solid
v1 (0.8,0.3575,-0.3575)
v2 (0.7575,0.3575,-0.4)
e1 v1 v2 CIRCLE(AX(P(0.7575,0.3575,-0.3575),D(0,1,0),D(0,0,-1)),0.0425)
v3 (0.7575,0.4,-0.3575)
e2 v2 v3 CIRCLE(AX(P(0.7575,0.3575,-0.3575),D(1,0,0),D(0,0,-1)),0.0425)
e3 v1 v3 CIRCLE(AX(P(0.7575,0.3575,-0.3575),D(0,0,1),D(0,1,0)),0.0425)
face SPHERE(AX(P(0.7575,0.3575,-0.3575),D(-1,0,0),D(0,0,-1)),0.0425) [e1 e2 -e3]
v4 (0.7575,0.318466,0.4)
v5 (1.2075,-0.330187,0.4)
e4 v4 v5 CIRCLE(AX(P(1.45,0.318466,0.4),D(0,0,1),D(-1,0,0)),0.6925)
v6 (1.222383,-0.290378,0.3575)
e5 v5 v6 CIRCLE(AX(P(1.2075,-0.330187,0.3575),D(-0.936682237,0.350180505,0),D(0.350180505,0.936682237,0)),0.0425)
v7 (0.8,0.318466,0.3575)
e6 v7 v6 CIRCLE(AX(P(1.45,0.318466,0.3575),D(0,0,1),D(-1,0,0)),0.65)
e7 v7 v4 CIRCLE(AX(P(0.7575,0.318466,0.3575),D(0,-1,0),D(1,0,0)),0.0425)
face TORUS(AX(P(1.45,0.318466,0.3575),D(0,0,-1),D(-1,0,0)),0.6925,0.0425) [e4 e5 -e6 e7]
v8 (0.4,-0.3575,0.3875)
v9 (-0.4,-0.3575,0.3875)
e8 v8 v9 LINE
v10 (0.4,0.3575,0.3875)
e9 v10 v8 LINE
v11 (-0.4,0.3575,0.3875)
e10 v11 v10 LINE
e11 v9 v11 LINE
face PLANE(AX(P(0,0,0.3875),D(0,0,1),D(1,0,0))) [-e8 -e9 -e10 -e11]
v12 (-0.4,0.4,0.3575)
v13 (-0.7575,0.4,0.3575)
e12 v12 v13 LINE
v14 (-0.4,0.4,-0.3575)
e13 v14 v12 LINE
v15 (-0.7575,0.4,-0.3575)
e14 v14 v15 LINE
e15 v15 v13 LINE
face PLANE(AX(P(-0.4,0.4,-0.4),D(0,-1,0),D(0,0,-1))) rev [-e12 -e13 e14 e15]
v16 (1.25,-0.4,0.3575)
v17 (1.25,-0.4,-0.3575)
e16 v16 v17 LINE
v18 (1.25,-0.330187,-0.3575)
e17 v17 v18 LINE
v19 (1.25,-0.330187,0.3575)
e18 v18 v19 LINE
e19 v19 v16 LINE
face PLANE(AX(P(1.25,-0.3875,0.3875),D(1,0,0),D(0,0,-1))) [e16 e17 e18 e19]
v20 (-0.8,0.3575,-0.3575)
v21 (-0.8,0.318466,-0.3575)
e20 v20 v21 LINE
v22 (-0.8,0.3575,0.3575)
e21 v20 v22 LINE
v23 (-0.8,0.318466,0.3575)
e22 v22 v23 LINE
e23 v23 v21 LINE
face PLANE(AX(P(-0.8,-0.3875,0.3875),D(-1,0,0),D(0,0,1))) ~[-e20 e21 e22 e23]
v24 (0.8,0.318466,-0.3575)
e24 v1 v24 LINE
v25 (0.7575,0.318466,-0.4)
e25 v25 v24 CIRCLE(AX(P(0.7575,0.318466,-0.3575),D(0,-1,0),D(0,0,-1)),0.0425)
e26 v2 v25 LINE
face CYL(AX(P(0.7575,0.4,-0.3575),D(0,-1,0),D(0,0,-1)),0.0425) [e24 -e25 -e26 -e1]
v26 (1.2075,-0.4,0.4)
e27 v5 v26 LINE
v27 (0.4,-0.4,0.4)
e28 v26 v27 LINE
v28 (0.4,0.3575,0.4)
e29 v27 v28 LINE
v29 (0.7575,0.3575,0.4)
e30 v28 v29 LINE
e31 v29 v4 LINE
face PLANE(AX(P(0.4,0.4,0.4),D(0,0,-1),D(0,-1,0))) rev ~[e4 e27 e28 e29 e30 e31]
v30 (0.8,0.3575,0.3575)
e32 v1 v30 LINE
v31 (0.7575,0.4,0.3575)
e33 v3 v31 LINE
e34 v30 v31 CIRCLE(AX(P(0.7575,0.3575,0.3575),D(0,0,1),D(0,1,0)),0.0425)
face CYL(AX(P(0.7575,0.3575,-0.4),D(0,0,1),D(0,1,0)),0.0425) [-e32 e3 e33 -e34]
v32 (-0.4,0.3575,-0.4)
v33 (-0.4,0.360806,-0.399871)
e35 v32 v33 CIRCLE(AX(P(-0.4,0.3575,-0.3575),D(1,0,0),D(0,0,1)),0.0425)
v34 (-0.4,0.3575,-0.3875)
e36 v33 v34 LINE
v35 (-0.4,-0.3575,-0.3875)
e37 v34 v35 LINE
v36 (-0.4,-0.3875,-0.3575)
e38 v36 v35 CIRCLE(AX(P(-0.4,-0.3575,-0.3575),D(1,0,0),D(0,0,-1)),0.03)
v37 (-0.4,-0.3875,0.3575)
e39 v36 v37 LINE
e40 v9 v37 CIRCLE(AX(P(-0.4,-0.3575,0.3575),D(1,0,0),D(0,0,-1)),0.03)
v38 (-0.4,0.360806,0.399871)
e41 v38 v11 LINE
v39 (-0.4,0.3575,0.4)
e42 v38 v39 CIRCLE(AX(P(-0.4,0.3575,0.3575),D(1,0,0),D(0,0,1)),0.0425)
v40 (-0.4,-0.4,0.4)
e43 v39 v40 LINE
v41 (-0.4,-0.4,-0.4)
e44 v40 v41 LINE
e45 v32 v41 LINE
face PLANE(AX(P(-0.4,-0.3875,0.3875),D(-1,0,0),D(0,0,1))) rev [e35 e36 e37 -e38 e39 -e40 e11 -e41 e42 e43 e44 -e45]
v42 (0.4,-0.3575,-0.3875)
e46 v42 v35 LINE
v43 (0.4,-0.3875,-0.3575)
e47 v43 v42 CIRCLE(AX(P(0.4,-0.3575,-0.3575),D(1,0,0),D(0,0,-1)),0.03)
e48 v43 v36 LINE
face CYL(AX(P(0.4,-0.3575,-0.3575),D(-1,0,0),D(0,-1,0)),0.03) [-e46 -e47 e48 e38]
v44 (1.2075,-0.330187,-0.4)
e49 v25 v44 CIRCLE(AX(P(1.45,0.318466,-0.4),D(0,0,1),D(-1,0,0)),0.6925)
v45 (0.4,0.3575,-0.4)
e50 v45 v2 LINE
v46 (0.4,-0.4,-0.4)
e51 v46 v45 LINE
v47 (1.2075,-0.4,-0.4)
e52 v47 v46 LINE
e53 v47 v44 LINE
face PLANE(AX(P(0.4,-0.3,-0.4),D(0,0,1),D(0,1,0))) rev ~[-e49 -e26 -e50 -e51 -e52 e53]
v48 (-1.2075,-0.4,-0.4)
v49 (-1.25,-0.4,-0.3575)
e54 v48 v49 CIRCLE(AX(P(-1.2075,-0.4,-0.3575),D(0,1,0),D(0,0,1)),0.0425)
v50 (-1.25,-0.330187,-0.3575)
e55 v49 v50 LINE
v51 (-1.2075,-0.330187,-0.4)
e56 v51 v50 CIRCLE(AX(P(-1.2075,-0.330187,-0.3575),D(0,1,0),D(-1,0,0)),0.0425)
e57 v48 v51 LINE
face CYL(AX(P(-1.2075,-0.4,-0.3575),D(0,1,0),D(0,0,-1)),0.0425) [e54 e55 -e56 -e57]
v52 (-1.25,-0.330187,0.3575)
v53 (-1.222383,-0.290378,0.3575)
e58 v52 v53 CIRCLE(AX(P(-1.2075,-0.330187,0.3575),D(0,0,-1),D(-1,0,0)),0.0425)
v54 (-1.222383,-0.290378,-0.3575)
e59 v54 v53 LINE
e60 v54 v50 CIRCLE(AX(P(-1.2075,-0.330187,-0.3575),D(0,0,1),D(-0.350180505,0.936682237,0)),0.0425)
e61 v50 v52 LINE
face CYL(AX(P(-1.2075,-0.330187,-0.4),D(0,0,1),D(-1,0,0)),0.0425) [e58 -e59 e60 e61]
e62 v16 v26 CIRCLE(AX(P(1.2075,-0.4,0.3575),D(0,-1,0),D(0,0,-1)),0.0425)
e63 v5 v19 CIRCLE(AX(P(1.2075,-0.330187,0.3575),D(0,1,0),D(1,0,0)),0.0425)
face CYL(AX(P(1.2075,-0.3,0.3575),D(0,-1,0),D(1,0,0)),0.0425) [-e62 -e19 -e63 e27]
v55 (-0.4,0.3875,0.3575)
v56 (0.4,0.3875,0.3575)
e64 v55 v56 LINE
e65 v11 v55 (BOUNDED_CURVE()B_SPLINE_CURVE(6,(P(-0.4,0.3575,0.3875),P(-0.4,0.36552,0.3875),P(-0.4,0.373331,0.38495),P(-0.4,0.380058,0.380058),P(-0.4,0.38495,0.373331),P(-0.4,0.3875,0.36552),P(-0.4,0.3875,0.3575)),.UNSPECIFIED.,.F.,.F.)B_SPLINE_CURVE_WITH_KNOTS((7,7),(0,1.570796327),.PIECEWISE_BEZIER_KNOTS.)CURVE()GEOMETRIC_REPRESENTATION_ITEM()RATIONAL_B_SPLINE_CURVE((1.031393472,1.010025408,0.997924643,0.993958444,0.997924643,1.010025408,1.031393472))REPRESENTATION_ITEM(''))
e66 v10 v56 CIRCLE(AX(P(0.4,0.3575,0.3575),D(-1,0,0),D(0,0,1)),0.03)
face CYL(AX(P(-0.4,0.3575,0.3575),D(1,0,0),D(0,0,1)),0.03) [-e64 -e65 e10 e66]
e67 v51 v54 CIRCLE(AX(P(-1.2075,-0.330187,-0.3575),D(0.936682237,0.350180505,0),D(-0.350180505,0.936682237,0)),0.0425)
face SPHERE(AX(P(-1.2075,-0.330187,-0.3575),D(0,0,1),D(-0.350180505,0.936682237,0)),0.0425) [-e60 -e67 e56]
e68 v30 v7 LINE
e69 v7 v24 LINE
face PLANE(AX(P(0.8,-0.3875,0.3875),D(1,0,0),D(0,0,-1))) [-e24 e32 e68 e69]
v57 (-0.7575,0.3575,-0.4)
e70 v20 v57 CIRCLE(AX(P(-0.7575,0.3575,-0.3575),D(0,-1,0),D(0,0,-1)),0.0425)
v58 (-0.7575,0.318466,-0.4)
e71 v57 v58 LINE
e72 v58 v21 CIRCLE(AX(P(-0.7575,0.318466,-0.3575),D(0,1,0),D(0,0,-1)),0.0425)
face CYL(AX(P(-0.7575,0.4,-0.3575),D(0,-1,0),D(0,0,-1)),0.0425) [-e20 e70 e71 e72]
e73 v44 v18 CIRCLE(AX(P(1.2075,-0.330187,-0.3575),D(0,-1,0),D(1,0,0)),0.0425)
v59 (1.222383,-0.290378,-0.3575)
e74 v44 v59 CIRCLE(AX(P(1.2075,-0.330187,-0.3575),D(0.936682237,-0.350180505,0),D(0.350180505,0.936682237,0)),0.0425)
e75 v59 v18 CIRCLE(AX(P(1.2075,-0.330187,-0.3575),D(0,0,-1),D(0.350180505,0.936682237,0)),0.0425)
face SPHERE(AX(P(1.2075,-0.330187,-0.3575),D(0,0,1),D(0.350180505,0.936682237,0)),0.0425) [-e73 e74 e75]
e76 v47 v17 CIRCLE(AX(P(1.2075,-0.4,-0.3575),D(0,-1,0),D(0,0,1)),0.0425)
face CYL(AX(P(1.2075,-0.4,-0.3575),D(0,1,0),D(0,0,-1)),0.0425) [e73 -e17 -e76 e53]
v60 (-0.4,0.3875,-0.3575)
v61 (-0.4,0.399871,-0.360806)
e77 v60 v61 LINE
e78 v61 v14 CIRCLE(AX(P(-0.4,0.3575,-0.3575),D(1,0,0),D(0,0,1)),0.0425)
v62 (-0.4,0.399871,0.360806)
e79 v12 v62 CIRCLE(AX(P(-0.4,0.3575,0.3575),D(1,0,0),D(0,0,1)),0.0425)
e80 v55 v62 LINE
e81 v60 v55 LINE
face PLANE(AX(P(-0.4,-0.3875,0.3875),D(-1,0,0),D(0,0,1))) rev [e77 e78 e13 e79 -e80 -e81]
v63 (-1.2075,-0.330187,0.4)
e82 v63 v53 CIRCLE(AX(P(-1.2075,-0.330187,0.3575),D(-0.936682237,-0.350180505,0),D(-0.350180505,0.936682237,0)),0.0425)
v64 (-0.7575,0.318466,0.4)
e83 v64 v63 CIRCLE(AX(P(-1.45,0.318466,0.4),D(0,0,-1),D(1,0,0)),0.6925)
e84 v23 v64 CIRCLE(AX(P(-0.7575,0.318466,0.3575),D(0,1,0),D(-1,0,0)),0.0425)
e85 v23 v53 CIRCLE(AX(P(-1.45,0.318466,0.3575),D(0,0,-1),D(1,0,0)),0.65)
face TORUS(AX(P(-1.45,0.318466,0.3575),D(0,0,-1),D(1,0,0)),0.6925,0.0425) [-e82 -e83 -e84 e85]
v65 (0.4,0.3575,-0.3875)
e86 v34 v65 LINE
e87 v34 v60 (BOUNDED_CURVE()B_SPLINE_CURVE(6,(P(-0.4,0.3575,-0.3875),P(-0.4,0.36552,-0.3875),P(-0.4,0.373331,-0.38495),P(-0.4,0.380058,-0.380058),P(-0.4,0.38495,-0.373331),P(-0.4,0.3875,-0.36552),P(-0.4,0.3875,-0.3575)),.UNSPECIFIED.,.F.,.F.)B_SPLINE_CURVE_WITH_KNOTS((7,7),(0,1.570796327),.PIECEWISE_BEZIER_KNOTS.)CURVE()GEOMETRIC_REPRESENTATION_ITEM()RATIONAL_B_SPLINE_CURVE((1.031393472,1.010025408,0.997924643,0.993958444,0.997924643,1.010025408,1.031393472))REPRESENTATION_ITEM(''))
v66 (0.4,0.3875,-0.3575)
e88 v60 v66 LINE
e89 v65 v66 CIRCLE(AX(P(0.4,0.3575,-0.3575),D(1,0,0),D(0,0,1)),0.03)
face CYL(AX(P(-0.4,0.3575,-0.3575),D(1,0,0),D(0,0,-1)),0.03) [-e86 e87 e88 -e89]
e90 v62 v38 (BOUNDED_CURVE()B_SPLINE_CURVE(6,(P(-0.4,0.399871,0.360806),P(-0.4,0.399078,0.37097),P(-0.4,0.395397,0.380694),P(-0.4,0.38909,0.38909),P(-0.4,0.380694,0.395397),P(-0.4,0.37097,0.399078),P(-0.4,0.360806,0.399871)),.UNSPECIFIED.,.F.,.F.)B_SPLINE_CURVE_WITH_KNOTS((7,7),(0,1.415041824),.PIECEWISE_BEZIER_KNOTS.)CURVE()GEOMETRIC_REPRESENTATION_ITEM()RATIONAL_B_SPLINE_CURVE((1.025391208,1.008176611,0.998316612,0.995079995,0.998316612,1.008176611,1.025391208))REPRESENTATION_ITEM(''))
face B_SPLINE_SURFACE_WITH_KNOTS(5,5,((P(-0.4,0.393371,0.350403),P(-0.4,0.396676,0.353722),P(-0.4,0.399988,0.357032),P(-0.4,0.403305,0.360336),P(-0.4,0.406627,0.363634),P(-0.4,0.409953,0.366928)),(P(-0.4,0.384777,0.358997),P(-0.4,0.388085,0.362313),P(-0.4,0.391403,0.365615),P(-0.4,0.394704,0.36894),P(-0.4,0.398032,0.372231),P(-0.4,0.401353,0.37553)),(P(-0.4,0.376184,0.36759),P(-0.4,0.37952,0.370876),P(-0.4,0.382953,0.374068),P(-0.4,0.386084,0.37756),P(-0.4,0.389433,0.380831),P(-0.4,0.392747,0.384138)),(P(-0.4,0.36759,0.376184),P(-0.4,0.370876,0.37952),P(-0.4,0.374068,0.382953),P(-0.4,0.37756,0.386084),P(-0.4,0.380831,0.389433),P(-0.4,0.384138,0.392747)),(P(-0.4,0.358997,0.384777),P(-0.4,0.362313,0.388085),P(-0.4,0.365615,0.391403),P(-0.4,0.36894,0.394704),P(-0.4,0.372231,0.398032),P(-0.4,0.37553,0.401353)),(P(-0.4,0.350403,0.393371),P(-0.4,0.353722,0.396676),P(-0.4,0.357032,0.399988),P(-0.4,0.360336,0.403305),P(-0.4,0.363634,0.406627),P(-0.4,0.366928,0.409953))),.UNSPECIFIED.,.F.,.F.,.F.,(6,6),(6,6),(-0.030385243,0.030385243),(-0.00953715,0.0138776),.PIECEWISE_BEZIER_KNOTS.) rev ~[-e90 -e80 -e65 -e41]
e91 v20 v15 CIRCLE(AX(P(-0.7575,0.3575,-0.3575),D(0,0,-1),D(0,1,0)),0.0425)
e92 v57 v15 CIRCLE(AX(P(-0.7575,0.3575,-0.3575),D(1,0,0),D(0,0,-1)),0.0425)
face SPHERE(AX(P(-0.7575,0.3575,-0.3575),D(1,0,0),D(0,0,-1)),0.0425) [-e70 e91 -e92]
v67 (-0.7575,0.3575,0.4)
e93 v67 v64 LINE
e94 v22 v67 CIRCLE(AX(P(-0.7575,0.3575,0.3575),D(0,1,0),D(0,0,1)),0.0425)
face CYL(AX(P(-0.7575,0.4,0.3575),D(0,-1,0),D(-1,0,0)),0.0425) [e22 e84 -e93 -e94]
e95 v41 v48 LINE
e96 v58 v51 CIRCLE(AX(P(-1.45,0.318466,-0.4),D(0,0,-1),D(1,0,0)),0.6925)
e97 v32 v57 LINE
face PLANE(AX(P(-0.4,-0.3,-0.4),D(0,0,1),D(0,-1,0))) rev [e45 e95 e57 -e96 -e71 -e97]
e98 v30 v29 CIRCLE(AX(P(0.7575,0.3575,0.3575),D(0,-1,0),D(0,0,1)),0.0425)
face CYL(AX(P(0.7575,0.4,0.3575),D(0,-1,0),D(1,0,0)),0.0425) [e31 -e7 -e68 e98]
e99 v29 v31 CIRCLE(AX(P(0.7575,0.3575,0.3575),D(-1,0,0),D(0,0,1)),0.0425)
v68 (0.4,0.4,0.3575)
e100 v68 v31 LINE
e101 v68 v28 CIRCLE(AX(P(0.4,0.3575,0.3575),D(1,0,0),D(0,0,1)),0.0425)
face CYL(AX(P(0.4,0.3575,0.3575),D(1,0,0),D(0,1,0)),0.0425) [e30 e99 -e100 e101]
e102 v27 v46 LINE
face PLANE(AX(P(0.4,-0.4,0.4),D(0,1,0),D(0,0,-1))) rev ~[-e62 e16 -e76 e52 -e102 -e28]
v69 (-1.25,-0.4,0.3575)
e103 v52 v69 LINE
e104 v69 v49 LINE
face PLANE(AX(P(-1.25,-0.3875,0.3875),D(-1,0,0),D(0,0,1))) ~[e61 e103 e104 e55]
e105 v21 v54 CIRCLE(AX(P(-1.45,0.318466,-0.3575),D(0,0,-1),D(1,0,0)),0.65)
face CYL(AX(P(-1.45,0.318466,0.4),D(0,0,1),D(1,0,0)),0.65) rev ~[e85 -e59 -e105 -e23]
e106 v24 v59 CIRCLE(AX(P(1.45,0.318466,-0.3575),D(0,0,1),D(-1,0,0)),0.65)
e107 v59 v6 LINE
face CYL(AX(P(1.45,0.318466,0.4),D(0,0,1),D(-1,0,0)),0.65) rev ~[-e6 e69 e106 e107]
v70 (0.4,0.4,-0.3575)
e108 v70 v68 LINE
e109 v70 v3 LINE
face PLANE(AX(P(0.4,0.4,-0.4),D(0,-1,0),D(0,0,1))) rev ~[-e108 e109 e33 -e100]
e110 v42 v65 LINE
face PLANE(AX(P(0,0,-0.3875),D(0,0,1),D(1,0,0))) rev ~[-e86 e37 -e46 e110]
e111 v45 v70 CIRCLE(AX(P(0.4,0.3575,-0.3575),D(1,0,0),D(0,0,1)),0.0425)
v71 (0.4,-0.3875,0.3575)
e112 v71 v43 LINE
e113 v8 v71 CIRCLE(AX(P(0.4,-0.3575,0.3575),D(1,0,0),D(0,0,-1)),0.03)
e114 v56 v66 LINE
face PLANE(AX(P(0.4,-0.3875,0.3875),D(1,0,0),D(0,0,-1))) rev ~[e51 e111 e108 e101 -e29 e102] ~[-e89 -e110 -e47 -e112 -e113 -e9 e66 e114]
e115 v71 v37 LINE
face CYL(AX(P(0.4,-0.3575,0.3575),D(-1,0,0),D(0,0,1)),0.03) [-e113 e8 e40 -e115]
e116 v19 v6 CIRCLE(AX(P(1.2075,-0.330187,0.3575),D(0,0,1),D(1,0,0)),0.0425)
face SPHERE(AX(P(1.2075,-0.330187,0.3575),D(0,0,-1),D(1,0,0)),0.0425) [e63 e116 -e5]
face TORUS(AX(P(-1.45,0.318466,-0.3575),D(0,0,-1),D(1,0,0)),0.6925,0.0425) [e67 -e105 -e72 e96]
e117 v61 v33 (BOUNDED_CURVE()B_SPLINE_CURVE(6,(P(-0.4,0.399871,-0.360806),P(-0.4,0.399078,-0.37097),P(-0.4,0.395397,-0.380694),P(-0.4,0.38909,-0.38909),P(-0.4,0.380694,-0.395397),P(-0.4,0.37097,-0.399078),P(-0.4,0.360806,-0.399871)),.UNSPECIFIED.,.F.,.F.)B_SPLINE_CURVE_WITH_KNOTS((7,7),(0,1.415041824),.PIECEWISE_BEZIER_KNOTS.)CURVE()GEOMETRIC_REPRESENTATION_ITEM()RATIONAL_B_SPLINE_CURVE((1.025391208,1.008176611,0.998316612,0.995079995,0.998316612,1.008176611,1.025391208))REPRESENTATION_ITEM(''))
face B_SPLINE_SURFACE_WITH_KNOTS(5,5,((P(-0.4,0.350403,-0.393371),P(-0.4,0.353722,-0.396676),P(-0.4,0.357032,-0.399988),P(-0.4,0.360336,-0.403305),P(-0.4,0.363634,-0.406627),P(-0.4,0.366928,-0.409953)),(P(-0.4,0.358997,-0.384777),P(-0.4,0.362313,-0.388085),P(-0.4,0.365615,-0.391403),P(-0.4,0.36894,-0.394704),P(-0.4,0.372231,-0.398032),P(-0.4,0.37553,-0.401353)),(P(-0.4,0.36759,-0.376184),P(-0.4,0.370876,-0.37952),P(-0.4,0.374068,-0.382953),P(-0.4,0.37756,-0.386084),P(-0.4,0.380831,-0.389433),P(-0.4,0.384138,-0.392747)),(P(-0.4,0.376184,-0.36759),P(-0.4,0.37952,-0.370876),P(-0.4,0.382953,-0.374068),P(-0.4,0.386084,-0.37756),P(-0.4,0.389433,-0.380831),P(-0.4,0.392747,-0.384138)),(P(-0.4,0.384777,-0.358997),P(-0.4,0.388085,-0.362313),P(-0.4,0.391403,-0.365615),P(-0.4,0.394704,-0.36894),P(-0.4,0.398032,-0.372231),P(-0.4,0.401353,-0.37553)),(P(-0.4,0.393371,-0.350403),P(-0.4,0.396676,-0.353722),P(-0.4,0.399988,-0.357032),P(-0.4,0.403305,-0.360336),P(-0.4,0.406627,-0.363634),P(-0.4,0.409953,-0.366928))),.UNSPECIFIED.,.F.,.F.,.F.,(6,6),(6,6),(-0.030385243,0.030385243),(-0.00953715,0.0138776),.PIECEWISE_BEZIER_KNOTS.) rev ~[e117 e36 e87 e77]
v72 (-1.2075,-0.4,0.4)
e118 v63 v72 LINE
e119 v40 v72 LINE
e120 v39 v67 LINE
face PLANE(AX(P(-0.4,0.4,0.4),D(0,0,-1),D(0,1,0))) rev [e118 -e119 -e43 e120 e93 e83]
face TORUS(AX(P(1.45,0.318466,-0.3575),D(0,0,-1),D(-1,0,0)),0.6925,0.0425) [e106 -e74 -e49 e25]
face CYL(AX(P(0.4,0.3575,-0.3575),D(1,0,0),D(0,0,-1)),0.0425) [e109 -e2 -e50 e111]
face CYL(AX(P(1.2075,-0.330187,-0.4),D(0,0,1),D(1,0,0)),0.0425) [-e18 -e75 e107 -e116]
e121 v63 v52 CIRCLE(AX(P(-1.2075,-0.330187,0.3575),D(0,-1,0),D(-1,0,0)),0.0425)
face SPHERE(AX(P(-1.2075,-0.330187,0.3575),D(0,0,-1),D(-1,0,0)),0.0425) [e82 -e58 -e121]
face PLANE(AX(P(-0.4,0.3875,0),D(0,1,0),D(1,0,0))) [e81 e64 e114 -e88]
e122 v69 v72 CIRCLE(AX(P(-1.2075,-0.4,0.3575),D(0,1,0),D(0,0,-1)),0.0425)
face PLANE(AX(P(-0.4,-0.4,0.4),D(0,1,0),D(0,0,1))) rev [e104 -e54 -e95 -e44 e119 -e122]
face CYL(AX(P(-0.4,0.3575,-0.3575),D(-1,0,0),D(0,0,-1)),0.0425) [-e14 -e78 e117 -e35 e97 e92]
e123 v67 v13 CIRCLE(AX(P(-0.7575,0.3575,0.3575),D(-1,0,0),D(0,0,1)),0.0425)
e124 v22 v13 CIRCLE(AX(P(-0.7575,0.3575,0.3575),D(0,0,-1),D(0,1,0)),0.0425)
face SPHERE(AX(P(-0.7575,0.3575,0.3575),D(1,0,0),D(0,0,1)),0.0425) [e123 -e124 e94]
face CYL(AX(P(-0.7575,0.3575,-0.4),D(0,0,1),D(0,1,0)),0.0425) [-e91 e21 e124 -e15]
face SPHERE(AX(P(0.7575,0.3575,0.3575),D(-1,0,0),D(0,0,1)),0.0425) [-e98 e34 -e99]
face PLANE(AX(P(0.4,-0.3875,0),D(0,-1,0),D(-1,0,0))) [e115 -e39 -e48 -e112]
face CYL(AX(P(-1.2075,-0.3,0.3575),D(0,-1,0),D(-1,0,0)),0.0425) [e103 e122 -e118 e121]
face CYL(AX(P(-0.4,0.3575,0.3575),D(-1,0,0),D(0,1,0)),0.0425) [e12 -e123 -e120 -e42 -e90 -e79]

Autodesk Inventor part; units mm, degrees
ref_plane "YZ Plane" through (0, 0, 0) normal (1, 0, 0) x (0, 1, 0)
ref_plane "XZ Plane" through (0, 0, 0) normal (0, 1, 0) x (-1, 0, 0)
ref_plane "XY Plane" through (0, 0, 0) normal (0, 0, 1) x (1, 0, 0)
sketch "Sketch10" plane through (0, 0, 0) normal (0, 0, 1) x (1, 0, 0)
  line L0 (-0.4, 0.3875) -> (0.4, 0.3875)
  line L1 (0.4, 0.3875) -> (0.4, -0.3875)
  line L2 (0.4, -0.3875) -> (-0.4, -0.3875)
  line L3 (-0.4, -0.3875) -> (-0.4, 0.3875)
  point P0 (0, 0)
  point P1 (-0.4, 0)
  point P2 (0, 0.3875)
  dimension "d7" = 0.8
  dimension "d8" = 0.775
extrude "Extrusion4" add sketch "Sketch10" along normal mid plane 0.775
sketch "Sketch11" plane through (0.4, -0.3875, 0.3875) normal (1, 0, 0) x (0, 0, -1)
  line L0 (0, 0.775) -> (0.775, 0.775) construction
  line L1 (0, 0) -> (0, 0.775) construction
  line L2 (0, 0) -> (0.775, 0) construction
  line L3 (0.775, 0.775) -> (0.775, 0) construction
  line L4 (0.7875, 0.7875) -> (-0.0125, 0.7875)
  line L5 (-0.0125, 0.7875) -> (-0.0125, -0.0125)
  line L6 (-0.0125, -0.0125) -> (0.7875, -0.0125)
  line L7 (0.7875, -0.0125) -> (0.7875, 0.7875)
  line L8 (-0.0125, -0.0125) -> (0.7875, -0.0125)
  line L9 (0.7875, -0.0125) -> (0.7875, 0.0875)
  line L10 (0.7875, 0.0875) -> (-0.0125, 0.0875)
  line L11 (-0.0125, 0.0875) -> (-0.0125, -0.0125)
  point P0 (0.3875, 0.3875)
  dimension "d14" = 0.1
  dimension "d20" = 0.0125
extrude "Extrusion5" add sketch "Sketch11" along normal blind 0.4
extrude "Extrusion6" add sketch "Sketch11" along normal blind 0.85 contours L7 L6 L5 L10
fillet "Fillet1" radius 0.65 1 edges at (0.8, -0.3, 0)
fillet "Fillet2" radius 0.0425 10 edges at (0.6, 0.4, -0.4) (0.6, 0.4, 0.4) (0.8, 0.3592, 0.4) (0.9244, -0.064, 0.4) (0.8, 0.3592, -0.4) (0.9244, -0.064, -0.4) (1.25, -0.35, -0.4) (1.25, -0.3, 0) (0.8, 0.4, 0) (1.25, -0.35, 0.4)
mirror "Mirror1" about plane through (0, 0, 0) normal (1, 0, 0) of "Extrusion5", "Fillet1", "Fillet2", "Extrusion6"
fillet "Fillet3" radius 0.03 4 edges at (0, 0.3875, -0.3875) (0, 0.3875, 0.3875) (0, -0.3875, -0.3875) (0, -0.3875, 0.3875)
properties part number "GRM188R61E475KE11D Capacitor" material "Laminate, Ivory, Matte"
